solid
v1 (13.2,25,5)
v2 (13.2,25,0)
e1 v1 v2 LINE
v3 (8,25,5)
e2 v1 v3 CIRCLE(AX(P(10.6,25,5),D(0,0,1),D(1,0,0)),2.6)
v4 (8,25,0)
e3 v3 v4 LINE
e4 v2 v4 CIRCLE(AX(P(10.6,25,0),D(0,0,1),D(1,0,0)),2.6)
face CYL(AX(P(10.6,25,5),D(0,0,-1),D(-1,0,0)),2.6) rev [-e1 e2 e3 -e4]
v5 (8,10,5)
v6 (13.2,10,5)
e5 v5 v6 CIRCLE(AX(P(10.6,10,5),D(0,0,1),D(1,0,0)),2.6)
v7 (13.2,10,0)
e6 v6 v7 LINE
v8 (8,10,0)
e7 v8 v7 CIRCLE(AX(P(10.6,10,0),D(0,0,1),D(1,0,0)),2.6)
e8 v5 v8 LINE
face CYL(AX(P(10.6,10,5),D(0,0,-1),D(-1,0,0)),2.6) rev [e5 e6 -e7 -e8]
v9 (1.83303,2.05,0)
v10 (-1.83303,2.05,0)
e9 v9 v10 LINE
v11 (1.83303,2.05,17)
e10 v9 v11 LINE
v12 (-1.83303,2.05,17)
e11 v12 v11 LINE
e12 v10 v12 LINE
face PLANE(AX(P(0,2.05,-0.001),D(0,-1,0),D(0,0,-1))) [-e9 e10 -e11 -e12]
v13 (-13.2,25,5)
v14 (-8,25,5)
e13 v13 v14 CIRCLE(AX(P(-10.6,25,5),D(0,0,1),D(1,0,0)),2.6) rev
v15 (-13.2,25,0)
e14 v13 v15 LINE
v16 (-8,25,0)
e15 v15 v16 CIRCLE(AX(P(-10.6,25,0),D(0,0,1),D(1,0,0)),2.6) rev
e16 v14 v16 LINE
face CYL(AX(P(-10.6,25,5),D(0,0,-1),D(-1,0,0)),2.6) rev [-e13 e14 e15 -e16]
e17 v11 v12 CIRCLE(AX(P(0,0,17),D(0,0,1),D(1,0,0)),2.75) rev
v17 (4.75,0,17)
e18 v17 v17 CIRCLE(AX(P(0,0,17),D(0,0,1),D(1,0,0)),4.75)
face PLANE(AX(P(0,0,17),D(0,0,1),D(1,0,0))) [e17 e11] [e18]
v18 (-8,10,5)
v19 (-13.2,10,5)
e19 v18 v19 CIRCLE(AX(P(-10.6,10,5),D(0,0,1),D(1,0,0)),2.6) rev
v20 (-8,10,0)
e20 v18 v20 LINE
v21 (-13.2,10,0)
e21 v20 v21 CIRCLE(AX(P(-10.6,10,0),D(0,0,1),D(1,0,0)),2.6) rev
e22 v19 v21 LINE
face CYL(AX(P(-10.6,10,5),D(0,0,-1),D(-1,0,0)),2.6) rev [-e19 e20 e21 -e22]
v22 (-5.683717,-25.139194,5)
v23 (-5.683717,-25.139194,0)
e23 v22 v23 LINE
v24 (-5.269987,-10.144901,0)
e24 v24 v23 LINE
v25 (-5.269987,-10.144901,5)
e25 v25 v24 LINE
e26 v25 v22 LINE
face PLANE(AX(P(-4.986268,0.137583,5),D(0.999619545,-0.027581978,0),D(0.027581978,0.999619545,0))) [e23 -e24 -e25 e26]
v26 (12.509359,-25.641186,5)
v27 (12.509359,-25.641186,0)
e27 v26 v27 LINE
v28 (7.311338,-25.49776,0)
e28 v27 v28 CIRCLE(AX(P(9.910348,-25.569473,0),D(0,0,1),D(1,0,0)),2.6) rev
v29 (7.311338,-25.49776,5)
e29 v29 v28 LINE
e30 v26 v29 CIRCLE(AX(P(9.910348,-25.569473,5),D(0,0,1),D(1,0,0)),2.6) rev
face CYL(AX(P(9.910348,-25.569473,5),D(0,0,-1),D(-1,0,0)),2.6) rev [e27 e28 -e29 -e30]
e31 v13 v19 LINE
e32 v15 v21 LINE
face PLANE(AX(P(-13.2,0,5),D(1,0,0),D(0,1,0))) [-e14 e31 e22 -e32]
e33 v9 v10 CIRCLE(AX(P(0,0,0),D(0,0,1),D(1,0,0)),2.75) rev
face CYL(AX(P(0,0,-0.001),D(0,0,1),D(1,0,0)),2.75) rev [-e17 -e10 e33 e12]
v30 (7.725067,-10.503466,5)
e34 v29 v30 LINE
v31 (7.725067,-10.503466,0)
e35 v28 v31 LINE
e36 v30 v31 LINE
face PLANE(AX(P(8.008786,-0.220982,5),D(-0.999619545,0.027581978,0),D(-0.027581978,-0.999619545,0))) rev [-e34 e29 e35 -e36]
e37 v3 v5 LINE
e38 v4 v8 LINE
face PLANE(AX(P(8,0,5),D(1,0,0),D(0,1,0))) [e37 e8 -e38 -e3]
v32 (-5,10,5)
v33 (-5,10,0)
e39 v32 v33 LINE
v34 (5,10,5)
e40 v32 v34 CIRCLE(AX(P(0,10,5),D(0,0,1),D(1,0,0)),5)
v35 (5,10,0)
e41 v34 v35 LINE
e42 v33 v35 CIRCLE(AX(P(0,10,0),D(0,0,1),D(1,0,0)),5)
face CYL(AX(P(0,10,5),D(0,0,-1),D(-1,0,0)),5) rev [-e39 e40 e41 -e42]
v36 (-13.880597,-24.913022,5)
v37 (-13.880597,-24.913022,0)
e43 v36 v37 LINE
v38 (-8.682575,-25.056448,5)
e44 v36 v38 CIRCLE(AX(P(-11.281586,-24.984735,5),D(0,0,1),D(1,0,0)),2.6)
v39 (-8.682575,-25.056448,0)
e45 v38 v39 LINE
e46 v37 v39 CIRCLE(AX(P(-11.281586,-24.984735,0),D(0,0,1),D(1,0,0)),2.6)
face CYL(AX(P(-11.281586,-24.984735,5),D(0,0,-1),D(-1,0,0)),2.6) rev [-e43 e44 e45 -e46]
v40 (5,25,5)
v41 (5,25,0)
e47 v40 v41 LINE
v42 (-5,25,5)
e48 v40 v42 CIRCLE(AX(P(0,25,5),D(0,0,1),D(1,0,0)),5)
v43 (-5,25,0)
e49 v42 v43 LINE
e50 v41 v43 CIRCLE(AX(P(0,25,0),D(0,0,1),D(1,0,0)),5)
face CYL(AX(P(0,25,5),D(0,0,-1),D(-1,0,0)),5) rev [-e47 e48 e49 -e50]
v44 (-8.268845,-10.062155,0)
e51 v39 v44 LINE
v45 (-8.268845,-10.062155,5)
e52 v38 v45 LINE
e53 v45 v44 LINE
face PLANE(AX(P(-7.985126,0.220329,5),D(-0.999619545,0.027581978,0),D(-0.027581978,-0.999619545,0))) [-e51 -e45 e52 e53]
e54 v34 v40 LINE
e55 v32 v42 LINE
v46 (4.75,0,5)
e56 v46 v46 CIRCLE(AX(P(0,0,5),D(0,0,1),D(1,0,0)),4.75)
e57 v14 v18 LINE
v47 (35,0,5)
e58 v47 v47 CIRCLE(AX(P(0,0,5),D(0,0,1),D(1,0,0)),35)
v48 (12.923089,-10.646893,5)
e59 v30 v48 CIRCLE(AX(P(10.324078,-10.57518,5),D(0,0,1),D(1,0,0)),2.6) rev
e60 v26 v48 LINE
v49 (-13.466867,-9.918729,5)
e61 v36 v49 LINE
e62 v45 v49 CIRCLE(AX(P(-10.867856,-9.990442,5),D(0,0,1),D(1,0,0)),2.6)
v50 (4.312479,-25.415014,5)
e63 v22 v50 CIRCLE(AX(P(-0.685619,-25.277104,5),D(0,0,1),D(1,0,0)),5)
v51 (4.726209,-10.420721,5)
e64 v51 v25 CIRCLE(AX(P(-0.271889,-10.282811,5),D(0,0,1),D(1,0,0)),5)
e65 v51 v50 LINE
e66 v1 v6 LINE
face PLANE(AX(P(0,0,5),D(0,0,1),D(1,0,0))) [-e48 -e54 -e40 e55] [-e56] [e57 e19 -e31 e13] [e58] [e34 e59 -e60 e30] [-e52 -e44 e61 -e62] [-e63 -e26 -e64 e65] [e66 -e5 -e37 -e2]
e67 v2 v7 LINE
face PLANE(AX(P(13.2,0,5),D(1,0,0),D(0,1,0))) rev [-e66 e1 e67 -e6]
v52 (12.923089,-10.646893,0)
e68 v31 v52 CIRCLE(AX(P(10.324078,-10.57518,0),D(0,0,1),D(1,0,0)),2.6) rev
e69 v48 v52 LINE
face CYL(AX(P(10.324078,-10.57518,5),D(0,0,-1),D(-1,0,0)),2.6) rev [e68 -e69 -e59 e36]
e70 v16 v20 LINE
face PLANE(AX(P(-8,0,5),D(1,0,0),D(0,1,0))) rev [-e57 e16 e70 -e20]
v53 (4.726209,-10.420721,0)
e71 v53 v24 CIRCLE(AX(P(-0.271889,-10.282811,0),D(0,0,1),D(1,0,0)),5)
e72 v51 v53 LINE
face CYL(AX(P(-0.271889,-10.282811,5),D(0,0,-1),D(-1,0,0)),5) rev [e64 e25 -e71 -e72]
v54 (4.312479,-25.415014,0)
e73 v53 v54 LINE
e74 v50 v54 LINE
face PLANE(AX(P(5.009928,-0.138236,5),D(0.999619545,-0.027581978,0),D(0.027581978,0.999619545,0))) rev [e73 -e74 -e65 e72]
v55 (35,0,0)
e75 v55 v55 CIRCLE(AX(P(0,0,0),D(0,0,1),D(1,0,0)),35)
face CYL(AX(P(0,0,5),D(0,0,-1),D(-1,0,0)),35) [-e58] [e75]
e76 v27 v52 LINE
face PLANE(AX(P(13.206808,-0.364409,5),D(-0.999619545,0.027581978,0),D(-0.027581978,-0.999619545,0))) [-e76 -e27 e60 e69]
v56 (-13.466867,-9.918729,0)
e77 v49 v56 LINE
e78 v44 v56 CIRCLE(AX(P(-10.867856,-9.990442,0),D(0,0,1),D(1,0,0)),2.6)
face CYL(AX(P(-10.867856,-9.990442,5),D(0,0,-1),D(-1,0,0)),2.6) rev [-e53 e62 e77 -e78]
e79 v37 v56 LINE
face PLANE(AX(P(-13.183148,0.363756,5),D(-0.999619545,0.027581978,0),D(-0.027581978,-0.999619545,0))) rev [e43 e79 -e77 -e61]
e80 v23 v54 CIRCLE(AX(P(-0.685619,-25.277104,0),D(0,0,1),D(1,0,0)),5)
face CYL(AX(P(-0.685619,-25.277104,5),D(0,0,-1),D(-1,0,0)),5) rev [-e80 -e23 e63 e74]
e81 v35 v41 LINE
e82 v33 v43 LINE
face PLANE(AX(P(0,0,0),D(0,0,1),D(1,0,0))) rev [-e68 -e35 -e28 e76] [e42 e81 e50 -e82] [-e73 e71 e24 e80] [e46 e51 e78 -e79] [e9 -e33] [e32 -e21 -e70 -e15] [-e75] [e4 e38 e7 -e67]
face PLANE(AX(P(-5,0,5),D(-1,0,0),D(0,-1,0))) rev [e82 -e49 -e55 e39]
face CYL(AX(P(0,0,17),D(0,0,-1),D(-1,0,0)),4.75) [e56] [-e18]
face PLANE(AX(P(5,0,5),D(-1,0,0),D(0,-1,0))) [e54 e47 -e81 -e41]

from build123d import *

# Parameters (mm, degrees)
ESQUISSE1_R             = 35
BOSS_EXTRU_1_DEPTH      = 5
ENL_V_MAT_EXTRU_1_REACH = 51.749
BOSS_EXTRU_3_START      = 12
ESQUISSE3_R             = 4.75
BOSS_EXTRU_3_DEPTH      = 12


with BuildPart() as part:
    # Esquisse1 → Boss.-Extru.1 (new body)
    with BuildSketch(Plane.XY):
        Circle(ESQUISSE1_R)
        with BuildLine():
            ThreePointArc((4.728110875, -10.282810642), (4.727635283, -10.351772147), (4.726208599, -10.420720532))
            Line((4.726208599, -10.420720532), (4.312478928, -25.415013705))
            ThreePointArc((4.312478928, -25.415013705), (-0.823528687, -30.275201539), (-5.683716521, -25.139193925))
            Line((-5.683716521, -25.139193925), (-5.26998685, -10.144900751))
            ThreePointArc((-5.26998685, -10.144900751), (-0.202927621, -5.283286233), (4.728110875, -10.282810642))
        make_face(mode=Mode.SUBTRACT)
        with BuildLine():
            Line((-8.268845484, -10.062154817), (-8.682575156, -25.05644799))
            ThreePointArc((-8.682575156, -25.05644799), (-11.353299115, -27.583745664), (-13.880596789, -24.913021704))
            Line((-13.880596789, -24.913021704), (-13.466867118, -9.918728531))
            ThreePointArc((-13.466867118, -9.918728531), (-10.796143158, -7.391430858), (-8.268845484, -10.062154817))
        make_face(mode=Mode.SUBTRACT)
        with BuildLine():
            Line((12.923088867, -10.646892753), (12.509359196, -25.641185926))
            ThreePointArc((12.509359196, -25.641185926), (9.838635236, -28.168483599), (7.311337562, -25.49775964))
            Line((7.311337562, -25.49775964), (7.725067233, -10.503466467))
            ThreePointArc((7.725067233, -10.503466467), (10.395791193, -7.976168793), (12.923088867, -10.646892753))
        make_face(mode=Mode.SUBTRACT)
        with BuildLine():
            Line((-13.2, 10), (-13.2, 25))
            ThreePointArc((-13.2, 25), (-10.6, 27.6), (-8, 25))
            Line((-8, 25), (-8, 10))
            ThreePointArc((-8, 10), (-10.6, 7.4), (-13.2, 10))
        make_face(mode=Mode.SUBTRACT)
        with BuildLine():
            ThreePointArc((5, 10), (0, 5), (-5, 10))
            Line((-5, 10), (-5, 25))
            ThreePointArc((-5, 25), (0, 30), (5, 25))
            Line((5, 25), (5, 10))
        make_face(mode=Mode.SUBTRACT)
        with BuildLine():
            ThreePointArc((8, 25), (10.6, 27.6), (13.2, 25))
            Line((13.2, 25), (13.2, 10))
            ThreePointArc((13.2, 10), (10.6, 7.4), (8, 10))
            Line((8, 10), (8, 25))
        make_face(mode=Mode.SUBTRACT)
    extrude(amount=BOSS_EXTRU_1_DEPTH)

    # Esquisse2 → Enlèv. mat.-Extru.1 (cut, up to next)
    with BuildSketch(Plane.XY.offset(5), mode=Mode.PRIVATE) as enl_v_mat_extru_1_sk1:
        with BuildLine():
            Line((1.833030278, 2.05), (-1.833030278, 2.05))
            ThreePointArc((-1.833030278, 2.05), (-1.122868366, -2.510312059), (2.75, 0))
            ThreePointArc((2.75, 0), (2.510312059, 1.122868366), (1.833030278, 2.05))
        make_face()
    enl_v_mat_extru_1_tool1 = extrude(enl_v_mat_extru_1_sk1.sketch, amount=-ENL_V_MAT_EXTRU_1_REACH, mode=Mode.PRIVATE) & part.part
    add(enl_v_mat_extru_1_tool1.solids().sort_by_distance((0, -0.186648, 5))[0], mode=Mode.SUBTRACT)

    # Esquisse3 → Boss.-Extru.3 (add)
    with BuildSketch(Plane.XY.offset(5).offset(BOSS_EXTRU_3_START)):
        Circle(ESQUISSE3_R)
        with BuildLine():
            ThreePointArc((1.833030278, 2.05), (0, -2.75), (-1.833030278, 2.05))
            Line((-1.833030278, 2.05), (1.833030278, 2.05))
        make_face(mode=Mode.SUBTRACT)
    extrude(amount=-BOSS_EXTRU_3_DEPTH)


solid = part.part
